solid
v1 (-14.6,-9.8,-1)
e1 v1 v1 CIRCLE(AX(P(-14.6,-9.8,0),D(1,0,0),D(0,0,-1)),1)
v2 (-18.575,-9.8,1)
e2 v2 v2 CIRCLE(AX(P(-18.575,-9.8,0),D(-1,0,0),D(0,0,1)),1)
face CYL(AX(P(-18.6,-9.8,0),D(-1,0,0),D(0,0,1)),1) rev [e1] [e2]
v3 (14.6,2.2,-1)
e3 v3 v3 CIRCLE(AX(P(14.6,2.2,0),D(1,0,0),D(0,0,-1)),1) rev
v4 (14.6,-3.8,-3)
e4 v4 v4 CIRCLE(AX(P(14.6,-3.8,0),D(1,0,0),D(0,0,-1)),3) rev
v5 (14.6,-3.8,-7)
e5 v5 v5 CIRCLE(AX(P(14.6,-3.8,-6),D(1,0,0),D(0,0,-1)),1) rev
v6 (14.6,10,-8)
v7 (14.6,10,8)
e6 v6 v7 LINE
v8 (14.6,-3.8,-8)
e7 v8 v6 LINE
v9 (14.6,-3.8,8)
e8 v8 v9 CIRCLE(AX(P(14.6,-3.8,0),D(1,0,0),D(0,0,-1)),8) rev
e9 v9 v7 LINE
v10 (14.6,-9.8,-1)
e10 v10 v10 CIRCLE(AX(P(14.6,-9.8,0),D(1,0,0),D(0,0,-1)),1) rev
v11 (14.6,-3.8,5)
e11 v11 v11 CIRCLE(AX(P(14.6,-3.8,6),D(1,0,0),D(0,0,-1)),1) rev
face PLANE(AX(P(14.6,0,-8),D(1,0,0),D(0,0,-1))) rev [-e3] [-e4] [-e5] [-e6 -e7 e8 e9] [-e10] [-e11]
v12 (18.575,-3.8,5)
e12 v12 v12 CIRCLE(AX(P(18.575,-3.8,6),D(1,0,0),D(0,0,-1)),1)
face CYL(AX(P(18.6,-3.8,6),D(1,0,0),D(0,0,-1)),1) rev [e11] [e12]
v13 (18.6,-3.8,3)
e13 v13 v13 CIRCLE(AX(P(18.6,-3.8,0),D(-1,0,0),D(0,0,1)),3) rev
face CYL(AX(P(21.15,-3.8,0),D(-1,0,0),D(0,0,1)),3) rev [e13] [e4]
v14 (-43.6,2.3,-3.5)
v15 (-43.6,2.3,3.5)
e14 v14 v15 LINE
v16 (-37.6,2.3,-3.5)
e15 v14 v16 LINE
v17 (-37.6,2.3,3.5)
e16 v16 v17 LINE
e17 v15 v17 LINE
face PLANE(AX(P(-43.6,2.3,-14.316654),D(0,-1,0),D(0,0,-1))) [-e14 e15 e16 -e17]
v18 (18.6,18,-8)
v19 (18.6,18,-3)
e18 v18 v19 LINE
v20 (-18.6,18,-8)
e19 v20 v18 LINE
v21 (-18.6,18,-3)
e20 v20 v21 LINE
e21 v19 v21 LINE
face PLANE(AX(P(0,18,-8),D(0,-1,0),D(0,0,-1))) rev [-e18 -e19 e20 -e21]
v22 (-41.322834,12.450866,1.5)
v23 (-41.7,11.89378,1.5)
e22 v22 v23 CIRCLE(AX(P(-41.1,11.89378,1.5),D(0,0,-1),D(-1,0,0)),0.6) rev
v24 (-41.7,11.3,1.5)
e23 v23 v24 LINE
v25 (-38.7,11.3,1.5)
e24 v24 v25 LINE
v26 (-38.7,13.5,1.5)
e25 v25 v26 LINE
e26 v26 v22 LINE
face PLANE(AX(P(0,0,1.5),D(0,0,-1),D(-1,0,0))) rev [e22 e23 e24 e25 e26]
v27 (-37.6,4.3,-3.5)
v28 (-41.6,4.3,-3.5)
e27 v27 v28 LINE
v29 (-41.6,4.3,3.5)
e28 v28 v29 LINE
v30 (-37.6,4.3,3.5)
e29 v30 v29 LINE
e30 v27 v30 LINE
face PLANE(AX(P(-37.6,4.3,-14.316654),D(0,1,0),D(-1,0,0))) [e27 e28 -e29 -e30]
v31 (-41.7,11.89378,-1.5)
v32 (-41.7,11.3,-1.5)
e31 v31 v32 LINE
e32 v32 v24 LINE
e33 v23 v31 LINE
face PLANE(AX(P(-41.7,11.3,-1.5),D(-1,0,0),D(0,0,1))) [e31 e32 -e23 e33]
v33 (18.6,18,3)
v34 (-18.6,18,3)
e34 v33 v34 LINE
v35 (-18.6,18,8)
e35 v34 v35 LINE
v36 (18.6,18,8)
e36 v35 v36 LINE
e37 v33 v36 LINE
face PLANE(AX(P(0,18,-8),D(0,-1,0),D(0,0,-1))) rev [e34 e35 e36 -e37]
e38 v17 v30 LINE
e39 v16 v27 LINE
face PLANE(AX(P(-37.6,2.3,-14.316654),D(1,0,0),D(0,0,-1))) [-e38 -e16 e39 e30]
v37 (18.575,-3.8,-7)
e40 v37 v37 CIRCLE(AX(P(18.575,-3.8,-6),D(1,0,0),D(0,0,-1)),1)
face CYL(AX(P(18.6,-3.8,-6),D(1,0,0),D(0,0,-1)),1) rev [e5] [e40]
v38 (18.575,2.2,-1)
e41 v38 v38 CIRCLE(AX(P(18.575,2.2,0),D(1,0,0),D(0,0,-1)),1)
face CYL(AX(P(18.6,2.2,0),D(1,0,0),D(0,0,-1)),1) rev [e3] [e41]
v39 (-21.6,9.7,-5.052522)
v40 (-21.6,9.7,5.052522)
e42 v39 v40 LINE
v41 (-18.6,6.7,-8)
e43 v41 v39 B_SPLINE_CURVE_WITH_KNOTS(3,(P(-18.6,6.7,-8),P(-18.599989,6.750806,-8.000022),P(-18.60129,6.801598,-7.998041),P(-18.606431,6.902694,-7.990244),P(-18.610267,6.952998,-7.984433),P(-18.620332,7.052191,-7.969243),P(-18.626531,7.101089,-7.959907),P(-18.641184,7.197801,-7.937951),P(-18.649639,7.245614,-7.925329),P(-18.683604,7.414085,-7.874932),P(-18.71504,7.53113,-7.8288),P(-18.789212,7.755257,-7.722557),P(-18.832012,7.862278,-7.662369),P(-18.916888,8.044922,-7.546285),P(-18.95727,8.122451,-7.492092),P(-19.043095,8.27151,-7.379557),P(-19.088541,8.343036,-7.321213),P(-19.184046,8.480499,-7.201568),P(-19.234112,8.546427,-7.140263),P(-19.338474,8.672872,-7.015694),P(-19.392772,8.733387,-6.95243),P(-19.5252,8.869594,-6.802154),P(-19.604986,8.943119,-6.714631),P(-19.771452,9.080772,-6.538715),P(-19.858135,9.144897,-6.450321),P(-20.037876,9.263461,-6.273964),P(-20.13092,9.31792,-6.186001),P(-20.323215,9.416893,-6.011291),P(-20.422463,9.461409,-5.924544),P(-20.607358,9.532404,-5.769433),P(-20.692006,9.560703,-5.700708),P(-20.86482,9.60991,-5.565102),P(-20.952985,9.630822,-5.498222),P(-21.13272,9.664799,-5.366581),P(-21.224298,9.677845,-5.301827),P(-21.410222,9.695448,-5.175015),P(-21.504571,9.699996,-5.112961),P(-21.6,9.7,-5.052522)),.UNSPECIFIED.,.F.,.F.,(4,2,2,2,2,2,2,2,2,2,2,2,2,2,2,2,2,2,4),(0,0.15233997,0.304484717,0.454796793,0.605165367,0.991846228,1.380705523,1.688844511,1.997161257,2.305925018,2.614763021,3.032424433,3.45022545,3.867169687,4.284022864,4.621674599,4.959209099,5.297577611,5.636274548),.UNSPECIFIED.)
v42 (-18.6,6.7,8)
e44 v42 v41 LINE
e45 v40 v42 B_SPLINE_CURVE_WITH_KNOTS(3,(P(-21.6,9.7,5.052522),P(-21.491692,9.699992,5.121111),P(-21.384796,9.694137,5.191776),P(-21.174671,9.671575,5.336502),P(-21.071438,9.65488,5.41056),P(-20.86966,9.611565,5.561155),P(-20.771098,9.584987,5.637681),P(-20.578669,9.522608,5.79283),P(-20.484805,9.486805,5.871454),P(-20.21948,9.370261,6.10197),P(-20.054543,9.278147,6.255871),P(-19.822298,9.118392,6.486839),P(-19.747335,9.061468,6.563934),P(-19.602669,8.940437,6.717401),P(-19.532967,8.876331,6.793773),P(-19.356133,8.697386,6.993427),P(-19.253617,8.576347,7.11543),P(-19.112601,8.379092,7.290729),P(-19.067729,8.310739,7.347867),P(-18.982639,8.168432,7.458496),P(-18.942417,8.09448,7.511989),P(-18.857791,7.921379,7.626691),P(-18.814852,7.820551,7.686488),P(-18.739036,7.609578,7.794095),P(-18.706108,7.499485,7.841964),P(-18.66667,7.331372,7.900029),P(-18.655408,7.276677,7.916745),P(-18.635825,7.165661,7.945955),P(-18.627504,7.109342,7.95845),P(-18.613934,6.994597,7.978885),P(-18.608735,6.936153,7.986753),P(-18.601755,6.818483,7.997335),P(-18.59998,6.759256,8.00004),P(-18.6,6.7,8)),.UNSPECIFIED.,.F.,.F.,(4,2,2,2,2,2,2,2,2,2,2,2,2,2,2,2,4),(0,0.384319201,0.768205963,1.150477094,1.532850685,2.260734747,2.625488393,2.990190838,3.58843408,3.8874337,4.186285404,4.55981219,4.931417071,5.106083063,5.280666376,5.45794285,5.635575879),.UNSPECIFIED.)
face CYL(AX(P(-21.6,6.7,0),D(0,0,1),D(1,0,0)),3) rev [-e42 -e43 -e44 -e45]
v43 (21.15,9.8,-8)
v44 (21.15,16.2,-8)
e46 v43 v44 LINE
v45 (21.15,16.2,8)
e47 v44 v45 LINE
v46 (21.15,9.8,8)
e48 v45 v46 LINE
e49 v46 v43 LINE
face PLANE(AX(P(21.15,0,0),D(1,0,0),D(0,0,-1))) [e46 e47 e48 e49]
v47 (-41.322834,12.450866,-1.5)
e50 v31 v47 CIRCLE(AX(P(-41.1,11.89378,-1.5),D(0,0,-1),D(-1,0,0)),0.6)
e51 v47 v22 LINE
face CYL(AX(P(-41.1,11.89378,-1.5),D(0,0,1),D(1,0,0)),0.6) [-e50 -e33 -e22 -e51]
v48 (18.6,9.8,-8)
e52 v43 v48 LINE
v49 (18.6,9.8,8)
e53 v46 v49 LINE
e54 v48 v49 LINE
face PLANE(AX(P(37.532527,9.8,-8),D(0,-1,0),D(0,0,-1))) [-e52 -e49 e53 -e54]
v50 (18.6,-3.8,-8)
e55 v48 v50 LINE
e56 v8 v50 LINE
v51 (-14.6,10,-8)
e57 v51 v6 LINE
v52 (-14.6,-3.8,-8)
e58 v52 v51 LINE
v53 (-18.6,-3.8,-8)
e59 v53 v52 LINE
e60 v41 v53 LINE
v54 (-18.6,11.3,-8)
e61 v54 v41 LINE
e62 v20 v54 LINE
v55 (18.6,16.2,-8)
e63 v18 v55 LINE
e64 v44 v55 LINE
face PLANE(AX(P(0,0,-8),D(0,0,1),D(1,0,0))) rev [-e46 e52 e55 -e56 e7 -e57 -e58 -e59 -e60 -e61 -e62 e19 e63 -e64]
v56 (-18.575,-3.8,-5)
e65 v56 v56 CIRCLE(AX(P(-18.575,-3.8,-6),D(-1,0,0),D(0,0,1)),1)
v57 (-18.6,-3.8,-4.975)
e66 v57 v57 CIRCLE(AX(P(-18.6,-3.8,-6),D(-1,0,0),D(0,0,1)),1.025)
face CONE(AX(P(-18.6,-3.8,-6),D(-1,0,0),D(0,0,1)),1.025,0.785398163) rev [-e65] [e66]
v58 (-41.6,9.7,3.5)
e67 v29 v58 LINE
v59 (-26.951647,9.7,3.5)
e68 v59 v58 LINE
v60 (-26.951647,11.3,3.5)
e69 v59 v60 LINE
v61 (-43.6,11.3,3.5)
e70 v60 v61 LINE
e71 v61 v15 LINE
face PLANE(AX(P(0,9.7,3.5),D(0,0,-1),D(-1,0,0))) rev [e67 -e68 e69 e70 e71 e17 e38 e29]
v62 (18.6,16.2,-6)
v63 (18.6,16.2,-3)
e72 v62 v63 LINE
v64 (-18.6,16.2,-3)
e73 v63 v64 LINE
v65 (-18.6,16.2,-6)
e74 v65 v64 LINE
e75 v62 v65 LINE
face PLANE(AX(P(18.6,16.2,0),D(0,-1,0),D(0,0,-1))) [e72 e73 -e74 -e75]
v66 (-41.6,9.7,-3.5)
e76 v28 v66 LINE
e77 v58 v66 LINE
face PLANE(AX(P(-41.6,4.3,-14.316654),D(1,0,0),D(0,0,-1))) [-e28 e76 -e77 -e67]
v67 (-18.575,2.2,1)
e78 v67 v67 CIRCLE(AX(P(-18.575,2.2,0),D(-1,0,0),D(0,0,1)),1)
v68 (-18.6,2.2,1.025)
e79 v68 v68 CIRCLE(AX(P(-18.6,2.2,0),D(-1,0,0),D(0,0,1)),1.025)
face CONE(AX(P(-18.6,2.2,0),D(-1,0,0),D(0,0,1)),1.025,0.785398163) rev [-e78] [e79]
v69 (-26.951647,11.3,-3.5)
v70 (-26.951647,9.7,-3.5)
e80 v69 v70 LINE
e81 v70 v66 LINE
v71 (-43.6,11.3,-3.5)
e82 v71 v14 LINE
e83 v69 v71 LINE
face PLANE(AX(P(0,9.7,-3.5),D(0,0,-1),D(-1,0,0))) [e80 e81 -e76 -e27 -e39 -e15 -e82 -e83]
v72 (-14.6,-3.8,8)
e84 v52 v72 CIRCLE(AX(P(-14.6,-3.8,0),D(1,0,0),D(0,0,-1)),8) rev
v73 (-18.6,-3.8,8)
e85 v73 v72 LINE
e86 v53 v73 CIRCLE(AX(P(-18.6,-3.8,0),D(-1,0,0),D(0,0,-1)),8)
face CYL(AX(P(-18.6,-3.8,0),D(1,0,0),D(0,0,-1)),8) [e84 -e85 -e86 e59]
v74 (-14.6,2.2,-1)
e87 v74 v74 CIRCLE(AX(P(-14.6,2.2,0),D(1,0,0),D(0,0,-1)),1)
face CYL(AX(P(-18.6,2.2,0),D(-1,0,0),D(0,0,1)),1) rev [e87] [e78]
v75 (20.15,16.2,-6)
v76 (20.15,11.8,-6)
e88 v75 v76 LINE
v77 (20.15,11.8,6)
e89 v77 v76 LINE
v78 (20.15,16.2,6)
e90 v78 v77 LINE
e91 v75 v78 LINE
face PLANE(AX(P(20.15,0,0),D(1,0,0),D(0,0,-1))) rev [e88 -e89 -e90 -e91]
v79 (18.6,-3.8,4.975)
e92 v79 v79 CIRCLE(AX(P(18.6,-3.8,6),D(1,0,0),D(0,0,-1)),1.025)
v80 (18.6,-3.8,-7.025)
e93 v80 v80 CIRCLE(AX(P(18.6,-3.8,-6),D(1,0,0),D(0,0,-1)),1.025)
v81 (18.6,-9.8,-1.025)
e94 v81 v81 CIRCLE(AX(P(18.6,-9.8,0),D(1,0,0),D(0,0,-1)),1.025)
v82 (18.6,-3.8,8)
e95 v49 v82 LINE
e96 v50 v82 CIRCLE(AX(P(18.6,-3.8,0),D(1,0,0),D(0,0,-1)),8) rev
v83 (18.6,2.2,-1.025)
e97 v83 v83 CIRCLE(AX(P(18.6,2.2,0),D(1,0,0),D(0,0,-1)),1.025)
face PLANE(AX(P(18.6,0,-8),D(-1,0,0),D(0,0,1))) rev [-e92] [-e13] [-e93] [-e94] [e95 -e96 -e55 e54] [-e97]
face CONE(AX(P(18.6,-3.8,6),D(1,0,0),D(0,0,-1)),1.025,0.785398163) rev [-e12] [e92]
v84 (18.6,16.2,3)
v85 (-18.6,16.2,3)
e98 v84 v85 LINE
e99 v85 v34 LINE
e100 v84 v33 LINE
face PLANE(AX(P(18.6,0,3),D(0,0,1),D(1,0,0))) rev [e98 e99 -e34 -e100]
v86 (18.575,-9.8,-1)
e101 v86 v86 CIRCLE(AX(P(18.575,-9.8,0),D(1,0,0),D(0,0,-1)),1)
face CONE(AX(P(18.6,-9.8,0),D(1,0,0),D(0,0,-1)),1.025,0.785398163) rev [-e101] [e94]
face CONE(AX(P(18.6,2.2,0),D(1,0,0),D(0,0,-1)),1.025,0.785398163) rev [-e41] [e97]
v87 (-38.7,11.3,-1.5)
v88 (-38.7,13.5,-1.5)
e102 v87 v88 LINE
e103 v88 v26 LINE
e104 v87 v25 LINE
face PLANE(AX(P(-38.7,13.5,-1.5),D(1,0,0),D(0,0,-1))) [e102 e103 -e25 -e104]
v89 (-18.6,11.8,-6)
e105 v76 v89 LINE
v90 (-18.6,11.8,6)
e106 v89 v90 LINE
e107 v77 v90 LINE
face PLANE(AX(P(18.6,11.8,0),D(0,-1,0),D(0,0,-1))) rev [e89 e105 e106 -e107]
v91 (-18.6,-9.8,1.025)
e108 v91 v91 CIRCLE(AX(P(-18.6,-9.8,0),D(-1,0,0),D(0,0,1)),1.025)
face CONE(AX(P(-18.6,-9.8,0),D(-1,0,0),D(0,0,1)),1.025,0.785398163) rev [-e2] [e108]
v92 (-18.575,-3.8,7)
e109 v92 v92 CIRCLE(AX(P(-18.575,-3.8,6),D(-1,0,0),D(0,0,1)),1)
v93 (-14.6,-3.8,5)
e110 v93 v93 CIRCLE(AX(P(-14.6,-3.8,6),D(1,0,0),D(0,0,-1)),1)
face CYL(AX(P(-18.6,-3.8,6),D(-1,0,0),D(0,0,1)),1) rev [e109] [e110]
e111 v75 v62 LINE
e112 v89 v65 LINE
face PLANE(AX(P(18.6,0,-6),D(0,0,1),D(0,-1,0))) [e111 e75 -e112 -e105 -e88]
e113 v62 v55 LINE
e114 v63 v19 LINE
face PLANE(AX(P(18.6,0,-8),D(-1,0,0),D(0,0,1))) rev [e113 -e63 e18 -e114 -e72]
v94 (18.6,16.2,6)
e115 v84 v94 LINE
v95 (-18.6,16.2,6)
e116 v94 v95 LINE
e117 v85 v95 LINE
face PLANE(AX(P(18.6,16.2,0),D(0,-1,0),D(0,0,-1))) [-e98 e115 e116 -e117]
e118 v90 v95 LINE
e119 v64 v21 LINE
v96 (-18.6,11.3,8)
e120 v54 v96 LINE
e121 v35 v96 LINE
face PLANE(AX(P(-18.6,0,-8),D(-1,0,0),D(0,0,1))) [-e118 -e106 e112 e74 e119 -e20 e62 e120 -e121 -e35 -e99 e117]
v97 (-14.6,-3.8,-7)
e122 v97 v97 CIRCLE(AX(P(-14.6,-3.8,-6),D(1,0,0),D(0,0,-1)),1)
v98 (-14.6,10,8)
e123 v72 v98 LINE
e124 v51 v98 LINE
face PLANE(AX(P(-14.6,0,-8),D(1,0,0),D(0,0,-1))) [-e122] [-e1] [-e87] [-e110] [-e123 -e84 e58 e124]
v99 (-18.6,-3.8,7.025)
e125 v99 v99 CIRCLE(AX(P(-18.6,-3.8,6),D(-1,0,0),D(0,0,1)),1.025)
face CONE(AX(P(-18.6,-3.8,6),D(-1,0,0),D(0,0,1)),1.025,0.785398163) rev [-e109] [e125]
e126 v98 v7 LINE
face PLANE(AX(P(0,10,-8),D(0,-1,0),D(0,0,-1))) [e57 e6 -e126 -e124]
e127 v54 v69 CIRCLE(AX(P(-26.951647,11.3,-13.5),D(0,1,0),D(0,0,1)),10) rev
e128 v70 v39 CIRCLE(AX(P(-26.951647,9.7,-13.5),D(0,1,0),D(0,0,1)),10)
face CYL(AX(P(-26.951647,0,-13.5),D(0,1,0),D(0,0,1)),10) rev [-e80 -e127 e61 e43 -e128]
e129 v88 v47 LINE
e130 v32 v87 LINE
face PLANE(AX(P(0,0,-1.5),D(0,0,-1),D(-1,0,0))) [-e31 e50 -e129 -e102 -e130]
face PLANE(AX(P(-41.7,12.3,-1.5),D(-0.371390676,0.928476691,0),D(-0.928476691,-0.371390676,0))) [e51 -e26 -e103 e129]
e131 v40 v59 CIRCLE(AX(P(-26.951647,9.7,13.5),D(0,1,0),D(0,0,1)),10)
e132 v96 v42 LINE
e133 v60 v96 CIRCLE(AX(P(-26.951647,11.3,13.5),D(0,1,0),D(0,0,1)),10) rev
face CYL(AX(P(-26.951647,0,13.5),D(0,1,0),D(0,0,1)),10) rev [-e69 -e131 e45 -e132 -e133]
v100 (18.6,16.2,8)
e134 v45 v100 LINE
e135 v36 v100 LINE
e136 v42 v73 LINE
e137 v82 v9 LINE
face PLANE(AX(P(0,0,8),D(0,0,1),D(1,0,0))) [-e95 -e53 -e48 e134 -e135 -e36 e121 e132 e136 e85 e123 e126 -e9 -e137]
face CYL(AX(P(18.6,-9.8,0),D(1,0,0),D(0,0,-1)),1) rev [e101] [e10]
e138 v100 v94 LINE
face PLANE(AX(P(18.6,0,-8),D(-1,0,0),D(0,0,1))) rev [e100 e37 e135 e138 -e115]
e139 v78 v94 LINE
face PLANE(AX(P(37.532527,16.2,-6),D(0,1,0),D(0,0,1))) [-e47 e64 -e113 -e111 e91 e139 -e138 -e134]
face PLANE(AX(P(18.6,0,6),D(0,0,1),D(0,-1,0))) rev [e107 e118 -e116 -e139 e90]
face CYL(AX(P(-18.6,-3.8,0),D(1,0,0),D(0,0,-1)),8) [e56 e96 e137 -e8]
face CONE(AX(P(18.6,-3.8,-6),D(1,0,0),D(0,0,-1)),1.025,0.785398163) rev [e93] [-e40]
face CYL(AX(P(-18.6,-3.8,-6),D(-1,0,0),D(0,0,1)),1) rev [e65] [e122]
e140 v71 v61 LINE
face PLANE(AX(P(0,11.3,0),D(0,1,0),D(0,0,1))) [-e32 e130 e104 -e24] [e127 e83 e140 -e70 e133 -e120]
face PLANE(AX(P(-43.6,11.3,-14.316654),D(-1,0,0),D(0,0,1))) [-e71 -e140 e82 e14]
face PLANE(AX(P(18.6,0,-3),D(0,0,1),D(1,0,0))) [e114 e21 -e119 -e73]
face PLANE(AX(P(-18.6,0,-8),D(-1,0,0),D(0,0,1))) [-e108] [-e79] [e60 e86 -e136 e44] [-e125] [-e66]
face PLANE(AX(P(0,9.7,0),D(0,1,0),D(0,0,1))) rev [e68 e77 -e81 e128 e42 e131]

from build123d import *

# Parameters (mm, degrees)
BOSS_EXTRUDE1_DEPTH             = 8
BOSS_EXTRUDE1_DEPTH_BACK        = 8
M1_6_CLEARANCE_HOLE1_AT_2_COUNT = 2
M1_6_CLEARANCE_HOLE1_AT_2_PITCH = 8.485281374
M1_6_CLEARANCE_HOLE1_AT_3_COUNT = 2
M1_6_CLEARANCE_HOLE1_AT_3_PITCH = 12
M1_6_CLEARANCE_HOLE1_AT_4_COUNT = 2
M1_6_CLEARANCE_HOLE1_AT_4_PITCH = 8.485281374
CUT_EXTRUDE1_DEPTH              = 43.093229859
CUT_EXTRUDE1_DEPTH_BACK         = 43.093229859
CUT_EXTRUDE2_DEPTH              = 43.093229859
CUT_EXTRUDE2_DEPTH_BACK         = 43.093229859
SKETCH6_W                       = 6
SKETCH6_H                       = 1.8
SKETCH6_W_2                     = 12
SKETCH6_H_2                     = 4.4
BOSS_EXTRUDE2_START             = -0.5
SKETCH8_W                       = 23
SKETCH8_H                       = 7
BOSS_EXTRUDE2_DEPTH             = 1.6
BOSS_EXTRUDE3_DEPTH             = 7
BOSS_EXTRUDE4_DEPTH             = 1.55
SKETCH13_W                      = 16
SKETCH13_H                      = 6.4
BOSS_EXTRUDE5_DEPTH             = 1
BOSS_EXTRUDE6_DEPTH             = 1.5
BOSS_EXTRUDE6_DEPTH_BACK        = 1.5
FILLET1_R                       = 0.6
FILLET2_R                       = 10
FILLET3_R                       = 3
CUT_EXTRUDE3_DEPTH              = 66.244463379
CUT_EXTRUDE3_DEPTH_BACK         = 10
SKETCH16_R                      = 3


with BuildPart() as part:
    # Sketch1 → Boss-Extrude1 (new, two sides: drawn at the far end of the back side and taken through both)
    with BuildSketch(Plane.XY.offset(-BOSS_EXTRUDE1_DEPTH_BACK)):
        Polygon((18.6, 18), (-18.6, 18), (-18.6, -18), (-14.6, -18), (-14.6, 10), (14.6, 10), (14.6, -18), (18.6, -18), align=None)
    extrude(amount=BOSS_EXTRUDE1_DEPTH + BOSS_EXTRUDE1_DEPTH_BACK)

    # Sketch4 → M1.6 Clearance Hole1 (revolve, cut)
    with BuildSketch(Plane(origin=(18.6, -3.8, 6), x_dir=(0, 0, -1), z_dir=(0, 1, 0))):
        Polygon((0, 0), (0, 4.600860619), (1, 4), (1, 0.025), (1.025, 0), align=None)
    m1_6_clearance_hole1 = revolve(axis=Axis((24.95, -3.8, 6), (-1, 0, 0)), mode=Mode.SUBTRACT)

    # M1.6 Clearance Hole1 at 2: M1.6 Clearance Hole1 ×2
    with Locations(*[Vector(0, 0.7071067811865476, -0.7071067811865476) * (i * M1_6_CLEARANCE_HOLE1_AT_2_PITCH) for i in range(1, M1_6_CLEARANCE_HOLE1_AT_2_COUNT)]):
        add(m1_6_clearance_hole1, mode=Mode.SUBTRACT)

    # M1.6 Clearance Hole1 at 3: M1.6 Clearance Hole1 ×2
    with Locations(*[(0, 0, -i * M1_6_CLEARANCE_HOLE1_AT_3_PITCH) for i in range(1, M1_6_CLEARANCE_HOLE1_AT_3_COUNT)]):
        add(m1_6_clearance_hole1, mode=Mode.SUBTRACT)

    # M1.6 Clearance Hole1 at 4: M1.6 Clearance Hole1 ×2
    with Locations(*[Vector(0, -0.7071067811865475, -0.7071067811865476) * (i * M1_6_CLEARANCE_HOLE1_AT_4_PITCH) for i in range(1, M1_6_CLEARANCE_HOLE1_AT_4_COUNT)]):
        add(m1_6_clearance_hole1, mode=Mode.SUBTRACT)

    # Mirror1: M1.6 Clearance Hole1 across plane
    add(m1_6_clearance_hole1.mirror(Plane(origin=(0, 0, 0), x_dir=(0, 0, 1), z_dir=(1, 0, 0))), mode=Mode.SUBTRACT)

    # Mirror1 copy 1 sketch → Mirror1 copy 1 (revolve, cut)
    with BuildSketch(Plane(origin=(-18.6, 2.2, 0), x_dir=(0, 0, -1), z_dir=(0, 1, 0))):
        Polygon((0, 0), (0, -4.600860619), (1, -4), (1, -0.025), (1.025, 0), align=None)
    revolve(axis=Axis((-24.95, 2.2, 0), (-1, 0, 0)), mode=Mode.SUBTRACT)

    # Mirror1 copy 2 sketch → Mirror1 copy 2 (revolve, cut)
    with BuildSketch(Plane(origin=(-18.6, -3.8, -6), x_dir=(0, 0, -1), z_dir=(0, 1, 0))):
        Polygon((0, 0), (0, -4.600860619), (1, -4), (1, -0.025), (1.025, 0), align=None)
    revolve(axis=Axis((-24.95, -3.8, -6), (-1, 0, 0)), mode=Mode.SUBTRACT)

    # Mirror1 copy 3 sketch → Mirror1 copy 3 (revolve, cut)
    with BuildSketch(Plane(origin=(-18.6, -9.8, 0), x_dir=(0, 0, -1), z_dir=(0, 1, 0))):
        Polygon((0, 0), (0, -4.600860619), (1, -4), (1, -0.025), (1.025, 0), align=None)
    revolve(axis=Axis((-24.95, -9.8, 0), (-1, 0, 0)), mode=Mode.SUBTRACT)

    # Sketch5 → Cut-Extrude1 (cut, two sides: drawn at the far end of the back side and taken through both)
    with BuildSketch(Plane(origin=(18.6, 0, 0), x_dir=(0, 0, -1), z_dir=(1, 0, 0)).offset(-CUT_EXTRUDE1_DEPTH_BACK)):
        with BuildLine():
            Line((-8, -3.8), (-8, -18))
            Line((-8, -18), (8, -18))
            Line((8, -18), (8, -3.8))
            ThreePointArc((8, -3.8), (0, -11.8), (-8, -3.8))
        make_face()
    extrude(amount=CUT_EXTRUDE1_DEPTH + CUT_EXTRUDE1_DEPTH_BACK, mode=Mode.SUBTRACT)

    # Sketch6 → Cut-Extrude2 (cut, two sides: drawn at the far end of the back side and taken through both)
    with BuildSketch(Plane.ZY.offset(18.6).offset(-CUT_EXTRUDE2_DEPTH_BACK)):
        with Locations((0, 17.1)):
            Rectangle(SKETCH6_W, SKETCH6_H)
        with Locations((0, 14)):
            Rectangle(SKETCH6_W_2, SKETCH6_H_2)
    extrude(amount=CUT_EXTRUDE2_DEPTH + CUT_EXTRUDE2_DEPTH_BACK, mode=Mode.SUBTRACT)

    # Sketch8 → Boss-Extrude2 (add)
    with BuildSketch(Plane(origin=(0, 11.8, 0), x_dir=(1, 0, 0), z_dir=(0, 1, 0)).offset(BOSS_EXTRUDE2_START)):
        with Locations((-30.1, 0)):
            Rectangle(SKETCH8_W, SKETCH8_H)
    extrude(amount=-BOSS_EXTRUDE2_DEPTH)

    # Sketch10 → Boss-Extrude3 (add)
    with BuildSketch(Plane.XY.offset(3.5)):
        Polygon((-41.6, 11.3), (-43.6, 11.3), (-43.6, 2.3), (-37.6, 2.3), (-37.6, 4.3), (-41.6, 4.3), align=None)
    extrude(amount=-BOSS_EXTRUDE3_DEPTH)

    # Sketch12 → Boss-Extrude4 (add)
    with BuildSketch(Plane(origin=(18.6, 0, 0), x_dir=(0, 0, -1), z_dir=(1, 0, 0))):
        Polygon((6, 11.8), (6, 16.2), (8, 16.2), (8, 9.8), (-8, 9.8), (-8, 16.2), (-6, 16.2), (-6, 11.8), align=None)
    extrude(amount=BOSS_EXTRUDE4_DEPTH)

    # Sketch13 → Boss-Extrude5 (add)
    with BuildSketch(Plane(origin=(20.15, 0, 0), x_dir=(0, 0, -1), z_dir=(1, 0, 0))):
        with Locations((0, 13)):
            Rectangle(SKETCH13_W, SKETCH13_H)
    extrude(amount=BOSS_EXTRUDE5_DEPTH)

    # Sketch14 → Boss-Extrude6 (add, two sides: drawn at the far end of the back side and taken through both)
    with BuildSketch(Plane.XY.offset(-BOSS_EXTRUDE6_DEPTH_BACK)):
        Polygon((-41.7, 11.3), (-41.7, 12.3), (-38.7, 13.5), (-38.7, 11.3), align=None)
    extrude(amount=BOSS_EXTRUDE6_DEPTH + BOSS_EXTRUDE6_DEPTH_BACK)

    # Fillet1
    fillet1_edges = [part.edges().sort_by_distance(p)[0] for p in [
        (-41.7, 12.3, 0),
    ]]
    fillet(fillet1_edges, radius=FILLET1_R)

    # Fillet2
    # the kernel refuses this fillet: 10 mm, written as the material it adds along each edge
    with BuildSketch(Plane(origin=(-18.6, 11.3, -3.5), x_dir=(-1.5292458657399207e-12, 0, -1.0), z_dir=(0, -1, 0))) as fillet2_piece_1:
        with BuildLine():
            CenterArc((10, -8.351646544), FILLET2_R, 123.367012969, 56.632987031)
            Line((0, -8.351646544), (0, 0))
            Line((0, 0), (4.5, 0))
        make_face()
    extrude(amount=1.6)
    with BuildSketch(Plane(origin=(-18.6, 11.3, 3.5), x_dir=(-1, 0, 0), z_dir=(0, -1, 0))) as fillet2_piece_2:
        with BuildLine():
            CenterArc((8.351646544, -10), FILLET2_R, 90, 56.632987031)
            Line((0, -4.5), (0, 0))
            Line((0, 0), (8.351646544, 0))
        make_face()
    extrude(amount=1.6)

    # Fillet3
    # the kernel refuses this fillet: 3 mm, written as the material it adds along each edge
    with BuildSketch(Plane(origin=(-18.6, 9.7, 3.5), x_dir=(-1, 0, 0), z_dir=(0, 0, -1))) as fillet3_piece_1:
        with BuildLine():
            CenterArc((FILLET3_R, -FILLET3_R), FILLET3_R, 90, 90)
            Line((0, -FILLET3_R), (0, 0))
            Line((0, 0), (FILLET3_R, 0))
        make_face()
    extrude(amount=7)
    with BuildSketch(Plane(origin=(-18.6, 9.7, 8), x_dir=(-1.0, 0, -1.5555555555538275e-12), z_dir=(1.5555555555538273e-12, 0, -1.0))) as fillet3_piece_2_section:
        with BuildLine():
            CenterArc((FILLET3_R, -FILLET3_R), FILLET3_R, 90, 90)
            Line((0, -FILLET3_R), (0, 0))
            Line((0, 0), (FILLET3_R, 0))
        make_face()
    fillet3_piece_2 = extrude(amount=4.5, mode=Mode.PRIVATE)
    fillet3_piece_2 = fillet3_piece_2 - Plane(origin=(-26.951646544, 8.943750406, 13.5), x_dir=(-1, 0, 0), z_dir=(0, 1, 0)) * Cylinder(10, 22, mode=Mode.PRIVATE)
    add(fillet3_piece_2)
    with BuildSketch(Plane(origin=(-18.6, 9.7, -3.5), x_dir=(-1.0, 0, 2e-12), z_dir=(-2e-12, 0, -1.0))) as fillet3_piece_3_section:
        with BuildLine():
            CenterArc((FILLET3_R, -FILLET3_R), FILLET3_R, 90, 90)
            Line((0, -FILLET3_R), (0, 0))
            Line((0, 0), (FILLET3_R, 0))
        make_face()
    fillet3_piece_3 = extrude(amount=4.5, mode=Mode.PRIVATE)
    fillet3_piece_3 = fillet3_piece_3 - Plane(origin=(-26.951646544, 8.943748833, -13.5), x_dir=(-2e-12, 0, -1.0), z_dir=(0, 1, 0)) * Cylinder(10, 22, mode=Mode.PRIVATE)
    add(fillet3_piece_3)

    # Sketch16 → Cut-Extrude3 (cut, two sides: drawn at the far end of the back side and taken through both)
    with BuildSketch(Plane(origin=(18.6, 0, 0), x_dir=(0, 0, -1), z_dir=(1, 0, 0)).offset(-CUT_EXTRUDE3_DEPTH_BACK)):
        with Locations(Location((0, -3.8, 0), (0, 0, 180))):
            Circle(SKETCH16_R)
    extrude(amount=CUT_EXTRUDE3_DEPTH + CUT_EXTRUDE3_DEPTH_BACK, mode=Mode.SUBTRACT)


solid = part.part
